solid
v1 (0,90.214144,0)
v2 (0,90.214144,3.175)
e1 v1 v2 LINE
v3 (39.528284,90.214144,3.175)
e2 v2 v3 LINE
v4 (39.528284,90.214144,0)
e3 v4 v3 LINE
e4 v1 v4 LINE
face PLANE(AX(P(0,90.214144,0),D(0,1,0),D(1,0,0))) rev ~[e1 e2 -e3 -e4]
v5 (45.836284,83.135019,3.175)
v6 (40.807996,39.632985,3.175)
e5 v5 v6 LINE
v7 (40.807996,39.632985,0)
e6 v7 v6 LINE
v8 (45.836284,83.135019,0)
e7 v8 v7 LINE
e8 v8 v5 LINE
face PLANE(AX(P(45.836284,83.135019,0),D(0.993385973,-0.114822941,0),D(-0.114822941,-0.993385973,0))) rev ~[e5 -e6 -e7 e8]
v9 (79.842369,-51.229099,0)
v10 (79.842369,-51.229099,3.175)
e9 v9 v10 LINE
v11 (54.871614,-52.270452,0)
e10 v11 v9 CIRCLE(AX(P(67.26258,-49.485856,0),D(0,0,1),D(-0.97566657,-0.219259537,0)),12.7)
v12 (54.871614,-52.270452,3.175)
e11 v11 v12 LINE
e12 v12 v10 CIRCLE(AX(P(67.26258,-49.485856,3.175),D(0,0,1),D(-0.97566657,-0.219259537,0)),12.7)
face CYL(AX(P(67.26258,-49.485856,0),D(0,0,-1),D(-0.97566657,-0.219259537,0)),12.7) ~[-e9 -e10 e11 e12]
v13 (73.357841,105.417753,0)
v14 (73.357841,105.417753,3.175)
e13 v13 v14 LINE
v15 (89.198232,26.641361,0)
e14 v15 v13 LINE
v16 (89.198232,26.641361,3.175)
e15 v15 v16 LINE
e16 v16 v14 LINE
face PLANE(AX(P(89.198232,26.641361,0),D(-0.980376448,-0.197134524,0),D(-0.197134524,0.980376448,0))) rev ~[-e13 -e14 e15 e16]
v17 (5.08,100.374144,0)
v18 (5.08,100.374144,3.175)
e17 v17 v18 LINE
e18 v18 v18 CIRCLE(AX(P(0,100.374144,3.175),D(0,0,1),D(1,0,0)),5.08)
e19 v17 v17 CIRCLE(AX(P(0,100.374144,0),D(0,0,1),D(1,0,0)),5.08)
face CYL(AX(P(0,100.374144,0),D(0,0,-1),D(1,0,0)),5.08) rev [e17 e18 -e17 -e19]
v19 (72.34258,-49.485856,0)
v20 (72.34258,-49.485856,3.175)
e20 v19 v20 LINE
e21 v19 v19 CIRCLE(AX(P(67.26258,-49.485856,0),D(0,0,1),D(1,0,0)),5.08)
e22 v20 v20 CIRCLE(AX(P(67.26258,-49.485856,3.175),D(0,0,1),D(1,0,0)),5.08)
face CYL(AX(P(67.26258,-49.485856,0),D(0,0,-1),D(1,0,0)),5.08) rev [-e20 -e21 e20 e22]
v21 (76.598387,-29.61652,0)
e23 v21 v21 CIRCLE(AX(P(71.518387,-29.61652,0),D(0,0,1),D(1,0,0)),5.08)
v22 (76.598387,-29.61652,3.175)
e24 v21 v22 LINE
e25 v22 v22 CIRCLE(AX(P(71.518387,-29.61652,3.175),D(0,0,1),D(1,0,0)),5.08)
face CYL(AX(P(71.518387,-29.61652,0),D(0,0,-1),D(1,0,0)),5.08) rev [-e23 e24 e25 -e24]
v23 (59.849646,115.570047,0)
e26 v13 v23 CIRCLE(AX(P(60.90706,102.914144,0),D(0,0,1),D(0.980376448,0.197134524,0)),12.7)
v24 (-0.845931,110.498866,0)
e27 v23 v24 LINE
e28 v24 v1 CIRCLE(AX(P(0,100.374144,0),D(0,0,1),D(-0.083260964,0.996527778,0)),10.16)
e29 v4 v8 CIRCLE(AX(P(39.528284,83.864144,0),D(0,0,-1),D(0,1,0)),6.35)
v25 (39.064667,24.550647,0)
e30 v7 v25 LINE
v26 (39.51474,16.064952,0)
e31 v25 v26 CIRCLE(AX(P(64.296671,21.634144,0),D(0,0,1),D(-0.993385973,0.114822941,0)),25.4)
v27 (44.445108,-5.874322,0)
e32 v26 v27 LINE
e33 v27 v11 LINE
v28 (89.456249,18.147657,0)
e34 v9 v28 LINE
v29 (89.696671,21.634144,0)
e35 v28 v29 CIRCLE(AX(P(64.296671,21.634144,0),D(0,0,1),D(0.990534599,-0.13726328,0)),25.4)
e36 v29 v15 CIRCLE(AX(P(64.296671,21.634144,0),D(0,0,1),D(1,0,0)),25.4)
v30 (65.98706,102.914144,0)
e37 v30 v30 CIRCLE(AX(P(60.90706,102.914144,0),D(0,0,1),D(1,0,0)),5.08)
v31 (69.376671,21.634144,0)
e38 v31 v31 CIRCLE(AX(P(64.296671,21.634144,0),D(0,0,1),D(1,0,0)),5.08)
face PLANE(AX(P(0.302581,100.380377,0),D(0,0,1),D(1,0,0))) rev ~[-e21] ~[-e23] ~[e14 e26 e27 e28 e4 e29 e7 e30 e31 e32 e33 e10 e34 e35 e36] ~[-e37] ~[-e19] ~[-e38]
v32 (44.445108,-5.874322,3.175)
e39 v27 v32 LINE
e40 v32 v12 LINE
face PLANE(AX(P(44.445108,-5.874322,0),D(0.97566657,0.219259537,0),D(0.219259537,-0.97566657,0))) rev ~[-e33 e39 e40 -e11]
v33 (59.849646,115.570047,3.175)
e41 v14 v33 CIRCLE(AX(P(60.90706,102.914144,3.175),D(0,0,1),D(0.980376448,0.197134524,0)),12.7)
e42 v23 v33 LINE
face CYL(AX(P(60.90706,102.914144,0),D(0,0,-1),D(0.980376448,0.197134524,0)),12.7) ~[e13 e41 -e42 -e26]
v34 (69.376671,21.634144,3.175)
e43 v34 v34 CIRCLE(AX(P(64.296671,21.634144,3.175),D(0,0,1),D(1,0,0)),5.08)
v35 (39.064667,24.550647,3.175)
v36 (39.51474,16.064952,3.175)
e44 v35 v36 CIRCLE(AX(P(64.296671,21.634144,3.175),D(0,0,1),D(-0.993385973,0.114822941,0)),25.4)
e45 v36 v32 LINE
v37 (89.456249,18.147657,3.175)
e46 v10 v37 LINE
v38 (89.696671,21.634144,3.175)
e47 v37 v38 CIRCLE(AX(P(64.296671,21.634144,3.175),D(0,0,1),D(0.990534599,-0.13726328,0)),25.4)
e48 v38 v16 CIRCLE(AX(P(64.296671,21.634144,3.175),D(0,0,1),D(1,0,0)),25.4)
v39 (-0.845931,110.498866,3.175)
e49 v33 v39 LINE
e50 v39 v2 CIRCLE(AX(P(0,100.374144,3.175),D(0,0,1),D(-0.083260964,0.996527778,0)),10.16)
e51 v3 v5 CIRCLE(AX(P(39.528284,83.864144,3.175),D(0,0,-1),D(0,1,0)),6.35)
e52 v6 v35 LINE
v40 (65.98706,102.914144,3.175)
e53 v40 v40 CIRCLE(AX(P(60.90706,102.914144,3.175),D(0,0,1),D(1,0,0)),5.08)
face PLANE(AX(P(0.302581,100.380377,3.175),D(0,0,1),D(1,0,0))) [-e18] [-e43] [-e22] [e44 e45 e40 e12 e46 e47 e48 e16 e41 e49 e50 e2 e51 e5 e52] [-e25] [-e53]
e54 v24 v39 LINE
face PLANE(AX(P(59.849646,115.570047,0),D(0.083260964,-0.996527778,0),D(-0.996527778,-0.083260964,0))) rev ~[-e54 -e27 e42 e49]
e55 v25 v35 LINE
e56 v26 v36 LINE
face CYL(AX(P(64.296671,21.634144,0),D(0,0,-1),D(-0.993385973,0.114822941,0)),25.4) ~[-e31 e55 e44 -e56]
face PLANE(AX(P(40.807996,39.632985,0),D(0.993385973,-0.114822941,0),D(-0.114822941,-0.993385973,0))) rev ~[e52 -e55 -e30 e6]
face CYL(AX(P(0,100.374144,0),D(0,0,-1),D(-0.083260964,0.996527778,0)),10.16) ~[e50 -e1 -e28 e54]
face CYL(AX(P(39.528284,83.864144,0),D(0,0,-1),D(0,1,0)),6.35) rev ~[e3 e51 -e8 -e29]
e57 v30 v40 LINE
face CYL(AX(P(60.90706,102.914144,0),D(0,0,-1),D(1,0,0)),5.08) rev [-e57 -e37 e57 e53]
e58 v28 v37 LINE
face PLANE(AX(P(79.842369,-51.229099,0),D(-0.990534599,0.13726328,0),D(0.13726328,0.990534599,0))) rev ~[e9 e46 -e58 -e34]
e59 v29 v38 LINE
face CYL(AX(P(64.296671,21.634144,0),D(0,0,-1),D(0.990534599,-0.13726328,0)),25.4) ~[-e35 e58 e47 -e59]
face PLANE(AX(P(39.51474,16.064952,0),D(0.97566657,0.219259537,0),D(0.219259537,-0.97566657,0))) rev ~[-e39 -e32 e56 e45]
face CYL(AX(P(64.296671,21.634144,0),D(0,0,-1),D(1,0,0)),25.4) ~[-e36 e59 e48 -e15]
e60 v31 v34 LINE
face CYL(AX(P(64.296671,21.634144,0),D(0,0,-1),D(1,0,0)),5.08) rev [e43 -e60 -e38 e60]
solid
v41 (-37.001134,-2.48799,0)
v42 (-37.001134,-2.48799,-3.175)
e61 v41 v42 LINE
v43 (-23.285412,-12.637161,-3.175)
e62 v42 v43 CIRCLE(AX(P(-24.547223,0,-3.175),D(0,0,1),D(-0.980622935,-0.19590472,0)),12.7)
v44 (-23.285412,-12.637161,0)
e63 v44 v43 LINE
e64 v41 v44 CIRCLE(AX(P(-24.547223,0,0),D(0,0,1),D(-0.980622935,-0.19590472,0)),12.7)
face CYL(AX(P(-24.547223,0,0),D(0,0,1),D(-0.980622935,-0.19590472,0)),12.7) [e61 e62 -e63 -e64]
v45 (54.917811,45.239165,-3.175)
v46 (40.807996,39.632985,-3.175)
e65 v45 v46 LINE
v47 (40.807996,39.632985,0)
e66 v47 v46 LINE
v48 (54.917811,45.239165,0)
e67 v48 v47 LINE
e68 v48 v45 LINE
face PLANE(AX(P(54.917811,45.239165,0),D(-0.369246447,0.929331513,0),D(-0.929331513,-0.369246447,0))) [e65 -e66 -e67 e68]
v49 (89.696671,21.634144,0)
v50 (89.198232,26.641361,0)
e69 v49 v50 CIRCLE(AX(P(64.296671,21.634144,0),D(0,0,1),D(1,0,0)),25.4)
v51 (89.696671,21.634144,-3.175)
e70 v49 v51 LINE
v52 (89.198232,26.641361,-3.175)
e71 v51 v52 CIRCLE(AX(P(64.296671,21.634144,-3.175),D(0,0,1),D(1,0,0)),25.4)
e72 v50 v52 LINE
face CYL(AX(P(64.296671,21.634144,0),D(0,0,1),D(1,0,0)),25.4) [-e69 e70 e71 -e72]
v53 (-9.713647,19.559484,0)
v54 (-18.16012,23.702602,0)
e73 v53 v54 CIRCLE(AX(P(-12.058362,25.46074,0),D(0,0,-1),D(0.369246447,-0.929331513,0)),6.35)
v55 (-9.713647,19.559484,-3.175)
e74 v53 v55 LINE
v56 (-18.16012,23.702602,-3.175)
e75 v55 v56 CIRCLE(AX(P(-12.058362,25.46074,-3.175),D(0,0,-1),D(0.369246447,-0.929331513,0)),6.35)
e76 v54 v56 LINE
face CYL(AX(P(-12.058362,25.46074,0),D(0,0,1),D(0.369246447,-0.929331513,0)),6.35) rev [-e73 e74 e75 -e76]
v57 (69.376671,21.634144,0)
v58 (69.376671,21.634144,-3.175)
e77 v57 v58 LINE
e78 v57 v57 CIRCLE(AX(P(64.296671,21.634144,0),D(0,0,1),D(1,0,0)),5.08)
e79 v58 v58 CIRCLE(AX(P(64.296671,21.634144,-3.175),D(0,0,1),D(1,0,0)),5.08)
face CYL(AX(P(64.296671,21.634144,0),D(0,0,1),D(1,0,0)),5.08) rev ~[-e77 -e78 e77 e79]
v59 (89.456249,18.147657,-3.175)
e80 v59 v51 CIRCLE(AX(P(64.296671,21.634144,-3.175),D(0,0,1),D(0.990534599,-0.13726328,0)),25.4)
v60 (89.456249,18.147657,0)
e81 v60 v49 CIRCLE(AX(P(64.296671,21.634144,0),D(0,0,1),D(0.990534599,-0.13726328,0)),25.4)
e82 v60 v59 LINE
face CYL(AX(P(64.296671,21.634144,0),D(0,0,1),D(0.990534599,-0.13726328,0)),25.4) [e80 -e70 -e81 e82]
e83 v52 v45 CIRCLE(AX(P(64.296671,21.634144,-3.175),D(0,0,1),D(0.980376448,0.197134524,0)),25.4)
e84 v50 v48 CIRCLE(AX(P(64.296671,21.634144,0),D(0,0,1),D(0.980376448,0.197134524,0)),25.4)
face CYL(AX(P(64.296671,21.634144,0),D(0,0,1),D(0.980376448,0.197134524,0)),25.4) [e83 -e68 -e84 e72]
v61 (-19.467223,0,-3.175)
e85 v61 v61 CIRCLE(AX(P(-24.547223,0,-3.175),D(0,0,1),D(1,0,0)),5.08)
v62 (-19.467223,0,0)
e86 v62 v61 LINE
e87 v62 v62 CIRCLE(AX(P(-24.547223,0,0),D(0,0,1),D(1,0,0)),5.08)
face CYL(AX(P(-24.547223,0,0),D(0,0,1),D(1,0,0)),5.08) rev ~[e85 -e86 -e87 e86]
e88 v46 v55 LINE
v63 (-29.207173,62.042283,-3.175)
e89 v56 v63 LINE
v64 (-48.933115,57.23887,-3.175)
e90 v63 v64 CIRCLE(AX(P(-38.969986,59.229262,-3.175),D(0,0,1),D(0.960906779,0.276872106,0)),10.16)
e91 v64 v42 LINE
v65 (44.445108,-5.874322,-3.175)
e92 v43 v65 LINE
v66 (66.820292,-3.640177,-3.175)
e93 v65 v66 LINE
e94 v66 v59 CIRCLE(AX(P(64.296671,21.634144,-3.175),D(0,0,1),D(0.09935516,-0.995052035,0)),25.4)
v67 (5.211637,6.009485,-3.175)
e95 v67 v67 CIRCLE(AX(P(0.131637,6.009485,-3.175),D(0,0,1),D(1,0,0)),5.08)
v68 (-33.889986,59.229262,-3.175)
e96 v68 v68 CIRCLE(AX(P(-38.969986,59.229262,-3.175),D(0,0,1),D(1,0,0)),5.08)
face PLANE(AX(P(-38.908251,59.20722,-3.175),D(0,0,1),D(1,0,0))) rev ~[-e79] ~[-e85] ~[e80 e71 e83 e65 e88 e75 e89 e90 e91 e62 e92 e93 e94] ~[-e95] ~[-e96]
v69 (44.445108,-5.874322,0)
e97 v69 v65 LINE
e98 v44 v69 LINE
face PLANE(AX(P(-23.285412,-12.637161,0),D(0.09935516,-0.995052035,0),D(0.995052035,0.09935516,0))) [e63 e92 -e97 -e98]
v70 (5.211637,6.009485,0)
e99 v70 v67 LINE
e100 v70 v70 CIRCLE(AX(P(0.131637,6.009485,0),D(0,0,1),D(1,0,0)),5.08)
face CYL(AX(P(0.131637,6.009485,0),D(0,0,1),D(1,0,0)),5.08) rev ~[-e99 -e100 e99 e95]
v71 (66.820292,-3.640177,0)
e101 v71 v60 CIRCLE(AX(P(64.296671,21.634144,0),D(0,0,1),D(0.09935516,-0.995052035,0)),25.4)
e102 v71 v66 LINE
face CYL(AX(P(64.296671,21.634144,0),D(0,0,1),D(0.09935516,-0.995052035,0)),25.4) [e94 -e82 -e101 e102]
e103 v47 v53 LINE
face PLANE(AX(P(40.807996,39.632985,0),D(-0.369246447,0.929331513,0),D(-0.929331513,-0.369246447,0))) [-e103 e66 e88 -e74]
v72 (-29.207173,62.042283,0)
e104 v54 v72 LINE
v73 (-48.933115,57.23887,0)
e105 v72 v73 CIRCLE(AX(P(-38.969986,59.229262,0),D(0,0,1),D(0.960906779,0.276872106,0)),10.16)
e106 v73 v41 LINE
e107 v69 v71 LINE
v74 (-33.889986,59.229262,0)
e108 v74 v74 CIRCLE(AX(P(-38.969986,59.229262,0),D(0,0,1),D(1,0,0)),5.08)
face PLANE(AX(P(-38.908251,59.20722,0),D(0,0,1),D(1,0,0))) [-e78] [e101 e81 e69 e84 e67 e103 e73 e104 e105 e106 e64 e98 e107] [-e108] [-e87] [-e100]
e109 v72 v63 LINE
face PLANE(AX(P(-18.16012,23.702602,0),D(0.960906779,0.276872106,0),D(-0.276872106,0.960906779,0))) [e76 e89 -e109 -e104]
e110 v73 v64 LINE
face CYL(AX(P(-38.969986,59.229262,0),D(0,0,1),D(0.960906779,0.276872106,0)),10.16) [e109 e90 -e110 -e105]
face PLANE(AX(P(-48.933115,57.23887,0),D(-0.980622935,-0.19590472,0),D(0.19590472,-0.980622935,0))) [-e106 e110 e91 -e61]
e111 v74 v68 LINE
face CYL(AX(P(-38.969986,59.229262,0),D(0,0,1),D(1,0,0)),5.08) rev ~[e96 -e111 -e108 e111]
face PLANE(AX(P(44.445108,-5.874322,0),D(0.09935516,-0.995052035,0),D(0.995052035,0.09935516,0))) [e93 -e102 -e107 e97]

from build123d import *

# Parameters (mm, degrees)
F0_R     = 5.08
F1_DEPTH = 3.175
F2_DEPTH = 3.175


# Not quite as in the source:
# - a feature names something its author has since deleted; it is built from what else it names


with BuildPart() as f1:
    # F0 (on Top) → F1 (new body)
    with BuildSketch(Plane.XY):
        with BuildLine():
            ThreePointArc((10.16, 100.3741442614), (6.8786240281, 107.8514520309), (-0.8459313937, 110.4988664836))
            ThreePointArc((-0.8459313937, 110.4988664836), (-10.1511767243, 99.9508109281), (0, 90.2141442614))
            ThreePointArc((0, 90.2141442614), (7.1842048969, 93.1899393645), (10.16, 100.3741442614))
        make_face()
        with Locations((0, 100.3741442614)):
            Circle(F0_R, mode=Mode.SUBTRACT)
        with BuildLine():
            ThreePointArc((54.8716142506, -52.2704518609), (67.7917463532, -62.174826644), (79.8423690943, -51.229099398))
            ThreePointArc((79.8423690943, -51.229099398), (79.9324913965, -50.3595474809), (79.9625796865, -49.4858557386))
            ThreePointArc((79.9625796865, -49.4858557386), (65.8617336987, -36.8633508161), (54.8716142506, -52.2704518609))
        make_face()
        with Locations((67.2625796865, -49.4858557386)):
            Circle(F0_R, mode=Mode.SUBTRACT)
        with BuildLine():
            ThreePointArc((73.3578412331, 105.4177527176), (73.5446019833, 104.1721352658), (73.6070603461, 102.9141442614))
            ThreePointArc((73.6070603461, 102.9141442614), (52.3087803109, 93.5675095495), (59.849646104, 115.5700470392))
            Line((59.849646104, 115.5700470392), (-0.8459313937, 110.4988664836))
            ThreePointArc((-0.8459313937, 110.4988664836), (6.8786240281, 107.8514520309), (10.16, 100.3741442614))
            ThreePointArc((10.16, 100.3741442614), (7.1842048969, 93.1899393645), (0, 90.2141442614))
            Line((0, 90.2141442614), (39.5282835187, 90.2141442614))
            ThreePointArc((39.5282835187, 90.2141442614), (44.2691931384, 88.0886295528), (45.8362844499, 83.135018585))
            Line((45.8362844499, 83.135018585), (40.8079958174, 39.6329853928))
            Line((40.8079958174, 39.6329853928), (54.917810899, 45.2391646928))
            ThreePointArc((54.917810899, 45.2391646928), (76.4089843694, 43.9601796602), (89.1982324351, 26.6413611739))
            Line((89.1982324351, 26.6413611739), (73.3578412331, 105.4177527176))
        make_face()
        with BuildLine():
            ThreePointArc((39.0646669362, 24.550646967), (44.1352803506, 37.083362389), (54.917810899, 45.2391646928))
            Line((54.917810899, 45.2391646928), (40.8079958174, 39.6329853928))
            Line((40.8079958174, 39.6329853928), (39.0646669362, 24.550646967))
        make_face()
        with BuildLine():
            Line((44.4451075952, -5.8743218991), (66.8202917314, -3.6401774247))
            ThreePointArc((66.8202917314, -3.6401774247), (49.4329187665, 1.0373270408), (39.514739789, 16.0649520167))
            Line((39.514739789, 16.0649520167), (44.4451075952, -5.8743218991))
        make_face()
        with BuildLine():
            ThreePointArc((59.849646104, 115.5700470392), (52.3087803109, 93.5675095495), (73.6070603461, 102.9141442614))
            ThreePointArc((73.6070603461, 102.9141442614), (73.5446019833, 104.1721352658), (73.3578412331, 105.4177527176))
            ThreePointArc((73.3578412331, 105.4177527176), (68.5372288157, 113.0665099525), (59.849646104, 115.5700470392))
        make_face()
        with Locations((60.9070603461, 102.9141442614)):
            Circle(F0_R, mode=Mode.SUBTRACT)
        with BuildLine():
            Line((79.8423690943, -51.229099398), (89.4562494765, 18.1476569426))
            ThreePointArc((89.4562494765, 18.1476569426), (81.9110772813, 3.3340710535), (66.8202917314, -3.6401774247))
            Line((66.8202917314, -3.6401774247), (44.4451075952, -5.8743218991))
            Line((44.4451075952, -5.8743218991), (54.8716142506, -52.2704518609))
            ThreePointArc((54.8716142506, -52.2704518609), (65.8617336987, -36.8633508161), (79.9625796865, -49.4858557386))
            ThreePointArc((79.9625796865, -49.4858557386), (79.9324913965, -50.3595474809), (79.8423690943, -51.229099398))
        make_face()
        with Locations((71.5183865738, -29.616519873)):
            Circle(F0_R, mode=Mode.SUBTRACT)
        with BuildLine():
            ThreePointArc((89.696670661, 21.6341442614), (89.5717539355, 24.1501262702), (89.1982324351, 26.6413611739))
            ThreePointArc((89.1982324351, 26.6413611739), (76.4089843694, 43.9601796602), (54.917810899, 45.2391646928))
            ThreePointArc((54.917810899, 45.2391646928), (44.1352803506, 37.083362389), (39.0646669362, 24.550646967))
            ThreePointArc((39.0646669362, 24.550646967), (38.9323222925, 20.288844354), (39.514739789, 16.0649520167))
            ThreePointArc((39.514739789, 16.0649520167), (49.4329187665, 1.0373270408), (66.8202917314, -3.6401774247))
            ThreePointArc((66.8202917314, -3.6401774247), (81.9110772813, 3.3340710535), (89.4562494765, 18.1476569426))
            ThreePointArc((89.4562494765, 18.1476569426), (89.636494081, 19.8867607767), (89.696670661, 21.6341442614))
        make_face()
        with Locations((64.296670661, 21.6341442614)):
            Circle(F0_R, mode=Mode.SUBTRACT)
    extrude(amount=F1_DEPTH)


with BuildPart() as f2:
    # F0 (on Top) → F2 (new body)
    with BuildSketch(Plane.XY):
        with BuildLine():
            ThreePointArc((-28.8099856228, 59.2292622952), (-28.9097724352, 60.6497237067), (-29.207172753, 62.0422828905))
            ThreePointArc((-29.207172753, 62.0422828905), (-41.3737794296, 69.1008060111), (-48.9331146431, 57.2388703429))
            ThreePointArc((-48.9331146431, 57.2388703429), (-37.9699333358, 49.1185998331), (-28.8099856228, 59.2292622952))
        make_face()
        with Locations((-38.9699856228, 59.2292622952)):
            Circle(F0_R, mode=Mode.SUBTRACT)
        with BuildLine():
            ThreePointArc((-37.0011340573, -2.4879899404), (-32.1015061527, -10.2089569865), (-23.2854122466, -12.6371608431))
            ThreePointArc((-23.2854122466, -12.6371608431), (-15.1314117759, -8.5224704811), (-11.8472227818, 0))
            ThreePointArc((-11.8472227818, 0), (-25.7972881405, 12.6383280777), (-37.0011340573, -2.4879899404))
        make_face()
        with Locations((-24.5472227818, 0)):
            Circle(F0_R, mode=Mode.SUBTRACT)
        with BuildLine():
            ThreePointArc((39.0646669362, 24.550646967), (44.1352803506, 37.083362389), (54.917810899, 45.2391646928))
            Line((54.917810899, 45.2391646928), (40.8079958174, 39.6329853928))
            Line((40.8079958174, 39.6329853928), (39.0646669362, 24.550646967))
        make_face()
        with BuildLine():
            Line((44.4451075952, -5.8743218991), (66.8202917314, -3.6401774247))
            ThreePointArc((66.8202917314, -3.6401774247), (49.4329187665, 1.0373270408), (39.514739789, 16.0649520167))
            Line((39.514739789, 16.0649520167), (44.4451075952, -5.8743218991))
        make_face()
        with BuildLine():
            ThreePointArc((89.696670661, 21.6341442614), (89.5717539355, 24.1501262702), (89.1982324351, 26.6413611739))
            ThreePointArc((89.1982324351, 26.6413611739), (76.4089843694, 43.9601796602), (54.917810899, 45.2391646928))
            ThreePointArc((54.917810899, 45.2391646928), (44.1352803506, 37.083362389), (39.0646669362, 24.550646967))
            ThreePointArc((39.0646669362, 24.550646967), (38.9323222925, 20.288844354), (39.514739789, 16.0649520167))
            ThreePointArc((39.514739789, 16.0649520167), (49.4329187665, 1.0373270408), (66.8202917314, -3.6401774247))
            ThreePointArc((66.8202917314, -3.6401774247), (81.9110772813, 3.3340710535), (89.4562494765, 18.1476569426))
            ThreePointArc((89.4562494765, 18.1476569426), (89.636494081, 19.8867607767), (89.696670661, 21.6341442614))
        make_face()
        with Locations((64.296670661, 21.6341442614)):
            Circle(F0_R, mode=Mode.SUBTRACT)
        with BuildLine():
            ThreePointArc((39.514739789, 16.0649520167), (38.9323222925, 20.288844354), (39.0646669362, 24.550646967))
            Line((39.0646669362, 24.550646967), (40.8079958174, 39.6329853928))
            Line((40.8079958174, 39.6329853928), (-9.7136466081, 19.5594844768))
            ThreePointArc((-9.7136466081, 19.5594844768), (-14.8548233, 19.7596605926), (-18.1601195922, 23.7026017126))
            Line((-18.1601195922, 23.7026017126), (-29.207172753, 62.0422828905))
            ThreePointArc((-29.207172753, 62.0422828905), (-28.9097724352, 60.6497237067), (-28.8099856228, 59.2292622952))
            ThreePointArc((-28.8099856228, 59.2292622952), (-37.9699333358, 49.1185998331), (-48.9331146431, 57.2388703429))
            Line((-48.9331146431, 57.2388703429), (-37.0011340573, -2.4879899404))
            ThreePointArc((-37.0011340573, -2.4879899404), (-25.7972881405, 12.6383280777), (-11.8472227818, 0))
            ThreePointArc((-11.8472227818, 0), (-15.1314117759, -8.5224704811), (-23.2854122466, -12.6371608431))
            Line((-23.2854122466, -12.6371608431), (44.4451075952, -5.8743218991))
            Line((44.4451075952, -5.8743218991), (39.514739789, 16.0649520167))
        make_face()
        with Locations((0.1316365078, 6.0094845171)):
            Circle(F0_R, mode=Mode.SUBTRACT)
    extrude(amount=-F2_DEPTH)


solid = Compound([f1.part, f2.part])
